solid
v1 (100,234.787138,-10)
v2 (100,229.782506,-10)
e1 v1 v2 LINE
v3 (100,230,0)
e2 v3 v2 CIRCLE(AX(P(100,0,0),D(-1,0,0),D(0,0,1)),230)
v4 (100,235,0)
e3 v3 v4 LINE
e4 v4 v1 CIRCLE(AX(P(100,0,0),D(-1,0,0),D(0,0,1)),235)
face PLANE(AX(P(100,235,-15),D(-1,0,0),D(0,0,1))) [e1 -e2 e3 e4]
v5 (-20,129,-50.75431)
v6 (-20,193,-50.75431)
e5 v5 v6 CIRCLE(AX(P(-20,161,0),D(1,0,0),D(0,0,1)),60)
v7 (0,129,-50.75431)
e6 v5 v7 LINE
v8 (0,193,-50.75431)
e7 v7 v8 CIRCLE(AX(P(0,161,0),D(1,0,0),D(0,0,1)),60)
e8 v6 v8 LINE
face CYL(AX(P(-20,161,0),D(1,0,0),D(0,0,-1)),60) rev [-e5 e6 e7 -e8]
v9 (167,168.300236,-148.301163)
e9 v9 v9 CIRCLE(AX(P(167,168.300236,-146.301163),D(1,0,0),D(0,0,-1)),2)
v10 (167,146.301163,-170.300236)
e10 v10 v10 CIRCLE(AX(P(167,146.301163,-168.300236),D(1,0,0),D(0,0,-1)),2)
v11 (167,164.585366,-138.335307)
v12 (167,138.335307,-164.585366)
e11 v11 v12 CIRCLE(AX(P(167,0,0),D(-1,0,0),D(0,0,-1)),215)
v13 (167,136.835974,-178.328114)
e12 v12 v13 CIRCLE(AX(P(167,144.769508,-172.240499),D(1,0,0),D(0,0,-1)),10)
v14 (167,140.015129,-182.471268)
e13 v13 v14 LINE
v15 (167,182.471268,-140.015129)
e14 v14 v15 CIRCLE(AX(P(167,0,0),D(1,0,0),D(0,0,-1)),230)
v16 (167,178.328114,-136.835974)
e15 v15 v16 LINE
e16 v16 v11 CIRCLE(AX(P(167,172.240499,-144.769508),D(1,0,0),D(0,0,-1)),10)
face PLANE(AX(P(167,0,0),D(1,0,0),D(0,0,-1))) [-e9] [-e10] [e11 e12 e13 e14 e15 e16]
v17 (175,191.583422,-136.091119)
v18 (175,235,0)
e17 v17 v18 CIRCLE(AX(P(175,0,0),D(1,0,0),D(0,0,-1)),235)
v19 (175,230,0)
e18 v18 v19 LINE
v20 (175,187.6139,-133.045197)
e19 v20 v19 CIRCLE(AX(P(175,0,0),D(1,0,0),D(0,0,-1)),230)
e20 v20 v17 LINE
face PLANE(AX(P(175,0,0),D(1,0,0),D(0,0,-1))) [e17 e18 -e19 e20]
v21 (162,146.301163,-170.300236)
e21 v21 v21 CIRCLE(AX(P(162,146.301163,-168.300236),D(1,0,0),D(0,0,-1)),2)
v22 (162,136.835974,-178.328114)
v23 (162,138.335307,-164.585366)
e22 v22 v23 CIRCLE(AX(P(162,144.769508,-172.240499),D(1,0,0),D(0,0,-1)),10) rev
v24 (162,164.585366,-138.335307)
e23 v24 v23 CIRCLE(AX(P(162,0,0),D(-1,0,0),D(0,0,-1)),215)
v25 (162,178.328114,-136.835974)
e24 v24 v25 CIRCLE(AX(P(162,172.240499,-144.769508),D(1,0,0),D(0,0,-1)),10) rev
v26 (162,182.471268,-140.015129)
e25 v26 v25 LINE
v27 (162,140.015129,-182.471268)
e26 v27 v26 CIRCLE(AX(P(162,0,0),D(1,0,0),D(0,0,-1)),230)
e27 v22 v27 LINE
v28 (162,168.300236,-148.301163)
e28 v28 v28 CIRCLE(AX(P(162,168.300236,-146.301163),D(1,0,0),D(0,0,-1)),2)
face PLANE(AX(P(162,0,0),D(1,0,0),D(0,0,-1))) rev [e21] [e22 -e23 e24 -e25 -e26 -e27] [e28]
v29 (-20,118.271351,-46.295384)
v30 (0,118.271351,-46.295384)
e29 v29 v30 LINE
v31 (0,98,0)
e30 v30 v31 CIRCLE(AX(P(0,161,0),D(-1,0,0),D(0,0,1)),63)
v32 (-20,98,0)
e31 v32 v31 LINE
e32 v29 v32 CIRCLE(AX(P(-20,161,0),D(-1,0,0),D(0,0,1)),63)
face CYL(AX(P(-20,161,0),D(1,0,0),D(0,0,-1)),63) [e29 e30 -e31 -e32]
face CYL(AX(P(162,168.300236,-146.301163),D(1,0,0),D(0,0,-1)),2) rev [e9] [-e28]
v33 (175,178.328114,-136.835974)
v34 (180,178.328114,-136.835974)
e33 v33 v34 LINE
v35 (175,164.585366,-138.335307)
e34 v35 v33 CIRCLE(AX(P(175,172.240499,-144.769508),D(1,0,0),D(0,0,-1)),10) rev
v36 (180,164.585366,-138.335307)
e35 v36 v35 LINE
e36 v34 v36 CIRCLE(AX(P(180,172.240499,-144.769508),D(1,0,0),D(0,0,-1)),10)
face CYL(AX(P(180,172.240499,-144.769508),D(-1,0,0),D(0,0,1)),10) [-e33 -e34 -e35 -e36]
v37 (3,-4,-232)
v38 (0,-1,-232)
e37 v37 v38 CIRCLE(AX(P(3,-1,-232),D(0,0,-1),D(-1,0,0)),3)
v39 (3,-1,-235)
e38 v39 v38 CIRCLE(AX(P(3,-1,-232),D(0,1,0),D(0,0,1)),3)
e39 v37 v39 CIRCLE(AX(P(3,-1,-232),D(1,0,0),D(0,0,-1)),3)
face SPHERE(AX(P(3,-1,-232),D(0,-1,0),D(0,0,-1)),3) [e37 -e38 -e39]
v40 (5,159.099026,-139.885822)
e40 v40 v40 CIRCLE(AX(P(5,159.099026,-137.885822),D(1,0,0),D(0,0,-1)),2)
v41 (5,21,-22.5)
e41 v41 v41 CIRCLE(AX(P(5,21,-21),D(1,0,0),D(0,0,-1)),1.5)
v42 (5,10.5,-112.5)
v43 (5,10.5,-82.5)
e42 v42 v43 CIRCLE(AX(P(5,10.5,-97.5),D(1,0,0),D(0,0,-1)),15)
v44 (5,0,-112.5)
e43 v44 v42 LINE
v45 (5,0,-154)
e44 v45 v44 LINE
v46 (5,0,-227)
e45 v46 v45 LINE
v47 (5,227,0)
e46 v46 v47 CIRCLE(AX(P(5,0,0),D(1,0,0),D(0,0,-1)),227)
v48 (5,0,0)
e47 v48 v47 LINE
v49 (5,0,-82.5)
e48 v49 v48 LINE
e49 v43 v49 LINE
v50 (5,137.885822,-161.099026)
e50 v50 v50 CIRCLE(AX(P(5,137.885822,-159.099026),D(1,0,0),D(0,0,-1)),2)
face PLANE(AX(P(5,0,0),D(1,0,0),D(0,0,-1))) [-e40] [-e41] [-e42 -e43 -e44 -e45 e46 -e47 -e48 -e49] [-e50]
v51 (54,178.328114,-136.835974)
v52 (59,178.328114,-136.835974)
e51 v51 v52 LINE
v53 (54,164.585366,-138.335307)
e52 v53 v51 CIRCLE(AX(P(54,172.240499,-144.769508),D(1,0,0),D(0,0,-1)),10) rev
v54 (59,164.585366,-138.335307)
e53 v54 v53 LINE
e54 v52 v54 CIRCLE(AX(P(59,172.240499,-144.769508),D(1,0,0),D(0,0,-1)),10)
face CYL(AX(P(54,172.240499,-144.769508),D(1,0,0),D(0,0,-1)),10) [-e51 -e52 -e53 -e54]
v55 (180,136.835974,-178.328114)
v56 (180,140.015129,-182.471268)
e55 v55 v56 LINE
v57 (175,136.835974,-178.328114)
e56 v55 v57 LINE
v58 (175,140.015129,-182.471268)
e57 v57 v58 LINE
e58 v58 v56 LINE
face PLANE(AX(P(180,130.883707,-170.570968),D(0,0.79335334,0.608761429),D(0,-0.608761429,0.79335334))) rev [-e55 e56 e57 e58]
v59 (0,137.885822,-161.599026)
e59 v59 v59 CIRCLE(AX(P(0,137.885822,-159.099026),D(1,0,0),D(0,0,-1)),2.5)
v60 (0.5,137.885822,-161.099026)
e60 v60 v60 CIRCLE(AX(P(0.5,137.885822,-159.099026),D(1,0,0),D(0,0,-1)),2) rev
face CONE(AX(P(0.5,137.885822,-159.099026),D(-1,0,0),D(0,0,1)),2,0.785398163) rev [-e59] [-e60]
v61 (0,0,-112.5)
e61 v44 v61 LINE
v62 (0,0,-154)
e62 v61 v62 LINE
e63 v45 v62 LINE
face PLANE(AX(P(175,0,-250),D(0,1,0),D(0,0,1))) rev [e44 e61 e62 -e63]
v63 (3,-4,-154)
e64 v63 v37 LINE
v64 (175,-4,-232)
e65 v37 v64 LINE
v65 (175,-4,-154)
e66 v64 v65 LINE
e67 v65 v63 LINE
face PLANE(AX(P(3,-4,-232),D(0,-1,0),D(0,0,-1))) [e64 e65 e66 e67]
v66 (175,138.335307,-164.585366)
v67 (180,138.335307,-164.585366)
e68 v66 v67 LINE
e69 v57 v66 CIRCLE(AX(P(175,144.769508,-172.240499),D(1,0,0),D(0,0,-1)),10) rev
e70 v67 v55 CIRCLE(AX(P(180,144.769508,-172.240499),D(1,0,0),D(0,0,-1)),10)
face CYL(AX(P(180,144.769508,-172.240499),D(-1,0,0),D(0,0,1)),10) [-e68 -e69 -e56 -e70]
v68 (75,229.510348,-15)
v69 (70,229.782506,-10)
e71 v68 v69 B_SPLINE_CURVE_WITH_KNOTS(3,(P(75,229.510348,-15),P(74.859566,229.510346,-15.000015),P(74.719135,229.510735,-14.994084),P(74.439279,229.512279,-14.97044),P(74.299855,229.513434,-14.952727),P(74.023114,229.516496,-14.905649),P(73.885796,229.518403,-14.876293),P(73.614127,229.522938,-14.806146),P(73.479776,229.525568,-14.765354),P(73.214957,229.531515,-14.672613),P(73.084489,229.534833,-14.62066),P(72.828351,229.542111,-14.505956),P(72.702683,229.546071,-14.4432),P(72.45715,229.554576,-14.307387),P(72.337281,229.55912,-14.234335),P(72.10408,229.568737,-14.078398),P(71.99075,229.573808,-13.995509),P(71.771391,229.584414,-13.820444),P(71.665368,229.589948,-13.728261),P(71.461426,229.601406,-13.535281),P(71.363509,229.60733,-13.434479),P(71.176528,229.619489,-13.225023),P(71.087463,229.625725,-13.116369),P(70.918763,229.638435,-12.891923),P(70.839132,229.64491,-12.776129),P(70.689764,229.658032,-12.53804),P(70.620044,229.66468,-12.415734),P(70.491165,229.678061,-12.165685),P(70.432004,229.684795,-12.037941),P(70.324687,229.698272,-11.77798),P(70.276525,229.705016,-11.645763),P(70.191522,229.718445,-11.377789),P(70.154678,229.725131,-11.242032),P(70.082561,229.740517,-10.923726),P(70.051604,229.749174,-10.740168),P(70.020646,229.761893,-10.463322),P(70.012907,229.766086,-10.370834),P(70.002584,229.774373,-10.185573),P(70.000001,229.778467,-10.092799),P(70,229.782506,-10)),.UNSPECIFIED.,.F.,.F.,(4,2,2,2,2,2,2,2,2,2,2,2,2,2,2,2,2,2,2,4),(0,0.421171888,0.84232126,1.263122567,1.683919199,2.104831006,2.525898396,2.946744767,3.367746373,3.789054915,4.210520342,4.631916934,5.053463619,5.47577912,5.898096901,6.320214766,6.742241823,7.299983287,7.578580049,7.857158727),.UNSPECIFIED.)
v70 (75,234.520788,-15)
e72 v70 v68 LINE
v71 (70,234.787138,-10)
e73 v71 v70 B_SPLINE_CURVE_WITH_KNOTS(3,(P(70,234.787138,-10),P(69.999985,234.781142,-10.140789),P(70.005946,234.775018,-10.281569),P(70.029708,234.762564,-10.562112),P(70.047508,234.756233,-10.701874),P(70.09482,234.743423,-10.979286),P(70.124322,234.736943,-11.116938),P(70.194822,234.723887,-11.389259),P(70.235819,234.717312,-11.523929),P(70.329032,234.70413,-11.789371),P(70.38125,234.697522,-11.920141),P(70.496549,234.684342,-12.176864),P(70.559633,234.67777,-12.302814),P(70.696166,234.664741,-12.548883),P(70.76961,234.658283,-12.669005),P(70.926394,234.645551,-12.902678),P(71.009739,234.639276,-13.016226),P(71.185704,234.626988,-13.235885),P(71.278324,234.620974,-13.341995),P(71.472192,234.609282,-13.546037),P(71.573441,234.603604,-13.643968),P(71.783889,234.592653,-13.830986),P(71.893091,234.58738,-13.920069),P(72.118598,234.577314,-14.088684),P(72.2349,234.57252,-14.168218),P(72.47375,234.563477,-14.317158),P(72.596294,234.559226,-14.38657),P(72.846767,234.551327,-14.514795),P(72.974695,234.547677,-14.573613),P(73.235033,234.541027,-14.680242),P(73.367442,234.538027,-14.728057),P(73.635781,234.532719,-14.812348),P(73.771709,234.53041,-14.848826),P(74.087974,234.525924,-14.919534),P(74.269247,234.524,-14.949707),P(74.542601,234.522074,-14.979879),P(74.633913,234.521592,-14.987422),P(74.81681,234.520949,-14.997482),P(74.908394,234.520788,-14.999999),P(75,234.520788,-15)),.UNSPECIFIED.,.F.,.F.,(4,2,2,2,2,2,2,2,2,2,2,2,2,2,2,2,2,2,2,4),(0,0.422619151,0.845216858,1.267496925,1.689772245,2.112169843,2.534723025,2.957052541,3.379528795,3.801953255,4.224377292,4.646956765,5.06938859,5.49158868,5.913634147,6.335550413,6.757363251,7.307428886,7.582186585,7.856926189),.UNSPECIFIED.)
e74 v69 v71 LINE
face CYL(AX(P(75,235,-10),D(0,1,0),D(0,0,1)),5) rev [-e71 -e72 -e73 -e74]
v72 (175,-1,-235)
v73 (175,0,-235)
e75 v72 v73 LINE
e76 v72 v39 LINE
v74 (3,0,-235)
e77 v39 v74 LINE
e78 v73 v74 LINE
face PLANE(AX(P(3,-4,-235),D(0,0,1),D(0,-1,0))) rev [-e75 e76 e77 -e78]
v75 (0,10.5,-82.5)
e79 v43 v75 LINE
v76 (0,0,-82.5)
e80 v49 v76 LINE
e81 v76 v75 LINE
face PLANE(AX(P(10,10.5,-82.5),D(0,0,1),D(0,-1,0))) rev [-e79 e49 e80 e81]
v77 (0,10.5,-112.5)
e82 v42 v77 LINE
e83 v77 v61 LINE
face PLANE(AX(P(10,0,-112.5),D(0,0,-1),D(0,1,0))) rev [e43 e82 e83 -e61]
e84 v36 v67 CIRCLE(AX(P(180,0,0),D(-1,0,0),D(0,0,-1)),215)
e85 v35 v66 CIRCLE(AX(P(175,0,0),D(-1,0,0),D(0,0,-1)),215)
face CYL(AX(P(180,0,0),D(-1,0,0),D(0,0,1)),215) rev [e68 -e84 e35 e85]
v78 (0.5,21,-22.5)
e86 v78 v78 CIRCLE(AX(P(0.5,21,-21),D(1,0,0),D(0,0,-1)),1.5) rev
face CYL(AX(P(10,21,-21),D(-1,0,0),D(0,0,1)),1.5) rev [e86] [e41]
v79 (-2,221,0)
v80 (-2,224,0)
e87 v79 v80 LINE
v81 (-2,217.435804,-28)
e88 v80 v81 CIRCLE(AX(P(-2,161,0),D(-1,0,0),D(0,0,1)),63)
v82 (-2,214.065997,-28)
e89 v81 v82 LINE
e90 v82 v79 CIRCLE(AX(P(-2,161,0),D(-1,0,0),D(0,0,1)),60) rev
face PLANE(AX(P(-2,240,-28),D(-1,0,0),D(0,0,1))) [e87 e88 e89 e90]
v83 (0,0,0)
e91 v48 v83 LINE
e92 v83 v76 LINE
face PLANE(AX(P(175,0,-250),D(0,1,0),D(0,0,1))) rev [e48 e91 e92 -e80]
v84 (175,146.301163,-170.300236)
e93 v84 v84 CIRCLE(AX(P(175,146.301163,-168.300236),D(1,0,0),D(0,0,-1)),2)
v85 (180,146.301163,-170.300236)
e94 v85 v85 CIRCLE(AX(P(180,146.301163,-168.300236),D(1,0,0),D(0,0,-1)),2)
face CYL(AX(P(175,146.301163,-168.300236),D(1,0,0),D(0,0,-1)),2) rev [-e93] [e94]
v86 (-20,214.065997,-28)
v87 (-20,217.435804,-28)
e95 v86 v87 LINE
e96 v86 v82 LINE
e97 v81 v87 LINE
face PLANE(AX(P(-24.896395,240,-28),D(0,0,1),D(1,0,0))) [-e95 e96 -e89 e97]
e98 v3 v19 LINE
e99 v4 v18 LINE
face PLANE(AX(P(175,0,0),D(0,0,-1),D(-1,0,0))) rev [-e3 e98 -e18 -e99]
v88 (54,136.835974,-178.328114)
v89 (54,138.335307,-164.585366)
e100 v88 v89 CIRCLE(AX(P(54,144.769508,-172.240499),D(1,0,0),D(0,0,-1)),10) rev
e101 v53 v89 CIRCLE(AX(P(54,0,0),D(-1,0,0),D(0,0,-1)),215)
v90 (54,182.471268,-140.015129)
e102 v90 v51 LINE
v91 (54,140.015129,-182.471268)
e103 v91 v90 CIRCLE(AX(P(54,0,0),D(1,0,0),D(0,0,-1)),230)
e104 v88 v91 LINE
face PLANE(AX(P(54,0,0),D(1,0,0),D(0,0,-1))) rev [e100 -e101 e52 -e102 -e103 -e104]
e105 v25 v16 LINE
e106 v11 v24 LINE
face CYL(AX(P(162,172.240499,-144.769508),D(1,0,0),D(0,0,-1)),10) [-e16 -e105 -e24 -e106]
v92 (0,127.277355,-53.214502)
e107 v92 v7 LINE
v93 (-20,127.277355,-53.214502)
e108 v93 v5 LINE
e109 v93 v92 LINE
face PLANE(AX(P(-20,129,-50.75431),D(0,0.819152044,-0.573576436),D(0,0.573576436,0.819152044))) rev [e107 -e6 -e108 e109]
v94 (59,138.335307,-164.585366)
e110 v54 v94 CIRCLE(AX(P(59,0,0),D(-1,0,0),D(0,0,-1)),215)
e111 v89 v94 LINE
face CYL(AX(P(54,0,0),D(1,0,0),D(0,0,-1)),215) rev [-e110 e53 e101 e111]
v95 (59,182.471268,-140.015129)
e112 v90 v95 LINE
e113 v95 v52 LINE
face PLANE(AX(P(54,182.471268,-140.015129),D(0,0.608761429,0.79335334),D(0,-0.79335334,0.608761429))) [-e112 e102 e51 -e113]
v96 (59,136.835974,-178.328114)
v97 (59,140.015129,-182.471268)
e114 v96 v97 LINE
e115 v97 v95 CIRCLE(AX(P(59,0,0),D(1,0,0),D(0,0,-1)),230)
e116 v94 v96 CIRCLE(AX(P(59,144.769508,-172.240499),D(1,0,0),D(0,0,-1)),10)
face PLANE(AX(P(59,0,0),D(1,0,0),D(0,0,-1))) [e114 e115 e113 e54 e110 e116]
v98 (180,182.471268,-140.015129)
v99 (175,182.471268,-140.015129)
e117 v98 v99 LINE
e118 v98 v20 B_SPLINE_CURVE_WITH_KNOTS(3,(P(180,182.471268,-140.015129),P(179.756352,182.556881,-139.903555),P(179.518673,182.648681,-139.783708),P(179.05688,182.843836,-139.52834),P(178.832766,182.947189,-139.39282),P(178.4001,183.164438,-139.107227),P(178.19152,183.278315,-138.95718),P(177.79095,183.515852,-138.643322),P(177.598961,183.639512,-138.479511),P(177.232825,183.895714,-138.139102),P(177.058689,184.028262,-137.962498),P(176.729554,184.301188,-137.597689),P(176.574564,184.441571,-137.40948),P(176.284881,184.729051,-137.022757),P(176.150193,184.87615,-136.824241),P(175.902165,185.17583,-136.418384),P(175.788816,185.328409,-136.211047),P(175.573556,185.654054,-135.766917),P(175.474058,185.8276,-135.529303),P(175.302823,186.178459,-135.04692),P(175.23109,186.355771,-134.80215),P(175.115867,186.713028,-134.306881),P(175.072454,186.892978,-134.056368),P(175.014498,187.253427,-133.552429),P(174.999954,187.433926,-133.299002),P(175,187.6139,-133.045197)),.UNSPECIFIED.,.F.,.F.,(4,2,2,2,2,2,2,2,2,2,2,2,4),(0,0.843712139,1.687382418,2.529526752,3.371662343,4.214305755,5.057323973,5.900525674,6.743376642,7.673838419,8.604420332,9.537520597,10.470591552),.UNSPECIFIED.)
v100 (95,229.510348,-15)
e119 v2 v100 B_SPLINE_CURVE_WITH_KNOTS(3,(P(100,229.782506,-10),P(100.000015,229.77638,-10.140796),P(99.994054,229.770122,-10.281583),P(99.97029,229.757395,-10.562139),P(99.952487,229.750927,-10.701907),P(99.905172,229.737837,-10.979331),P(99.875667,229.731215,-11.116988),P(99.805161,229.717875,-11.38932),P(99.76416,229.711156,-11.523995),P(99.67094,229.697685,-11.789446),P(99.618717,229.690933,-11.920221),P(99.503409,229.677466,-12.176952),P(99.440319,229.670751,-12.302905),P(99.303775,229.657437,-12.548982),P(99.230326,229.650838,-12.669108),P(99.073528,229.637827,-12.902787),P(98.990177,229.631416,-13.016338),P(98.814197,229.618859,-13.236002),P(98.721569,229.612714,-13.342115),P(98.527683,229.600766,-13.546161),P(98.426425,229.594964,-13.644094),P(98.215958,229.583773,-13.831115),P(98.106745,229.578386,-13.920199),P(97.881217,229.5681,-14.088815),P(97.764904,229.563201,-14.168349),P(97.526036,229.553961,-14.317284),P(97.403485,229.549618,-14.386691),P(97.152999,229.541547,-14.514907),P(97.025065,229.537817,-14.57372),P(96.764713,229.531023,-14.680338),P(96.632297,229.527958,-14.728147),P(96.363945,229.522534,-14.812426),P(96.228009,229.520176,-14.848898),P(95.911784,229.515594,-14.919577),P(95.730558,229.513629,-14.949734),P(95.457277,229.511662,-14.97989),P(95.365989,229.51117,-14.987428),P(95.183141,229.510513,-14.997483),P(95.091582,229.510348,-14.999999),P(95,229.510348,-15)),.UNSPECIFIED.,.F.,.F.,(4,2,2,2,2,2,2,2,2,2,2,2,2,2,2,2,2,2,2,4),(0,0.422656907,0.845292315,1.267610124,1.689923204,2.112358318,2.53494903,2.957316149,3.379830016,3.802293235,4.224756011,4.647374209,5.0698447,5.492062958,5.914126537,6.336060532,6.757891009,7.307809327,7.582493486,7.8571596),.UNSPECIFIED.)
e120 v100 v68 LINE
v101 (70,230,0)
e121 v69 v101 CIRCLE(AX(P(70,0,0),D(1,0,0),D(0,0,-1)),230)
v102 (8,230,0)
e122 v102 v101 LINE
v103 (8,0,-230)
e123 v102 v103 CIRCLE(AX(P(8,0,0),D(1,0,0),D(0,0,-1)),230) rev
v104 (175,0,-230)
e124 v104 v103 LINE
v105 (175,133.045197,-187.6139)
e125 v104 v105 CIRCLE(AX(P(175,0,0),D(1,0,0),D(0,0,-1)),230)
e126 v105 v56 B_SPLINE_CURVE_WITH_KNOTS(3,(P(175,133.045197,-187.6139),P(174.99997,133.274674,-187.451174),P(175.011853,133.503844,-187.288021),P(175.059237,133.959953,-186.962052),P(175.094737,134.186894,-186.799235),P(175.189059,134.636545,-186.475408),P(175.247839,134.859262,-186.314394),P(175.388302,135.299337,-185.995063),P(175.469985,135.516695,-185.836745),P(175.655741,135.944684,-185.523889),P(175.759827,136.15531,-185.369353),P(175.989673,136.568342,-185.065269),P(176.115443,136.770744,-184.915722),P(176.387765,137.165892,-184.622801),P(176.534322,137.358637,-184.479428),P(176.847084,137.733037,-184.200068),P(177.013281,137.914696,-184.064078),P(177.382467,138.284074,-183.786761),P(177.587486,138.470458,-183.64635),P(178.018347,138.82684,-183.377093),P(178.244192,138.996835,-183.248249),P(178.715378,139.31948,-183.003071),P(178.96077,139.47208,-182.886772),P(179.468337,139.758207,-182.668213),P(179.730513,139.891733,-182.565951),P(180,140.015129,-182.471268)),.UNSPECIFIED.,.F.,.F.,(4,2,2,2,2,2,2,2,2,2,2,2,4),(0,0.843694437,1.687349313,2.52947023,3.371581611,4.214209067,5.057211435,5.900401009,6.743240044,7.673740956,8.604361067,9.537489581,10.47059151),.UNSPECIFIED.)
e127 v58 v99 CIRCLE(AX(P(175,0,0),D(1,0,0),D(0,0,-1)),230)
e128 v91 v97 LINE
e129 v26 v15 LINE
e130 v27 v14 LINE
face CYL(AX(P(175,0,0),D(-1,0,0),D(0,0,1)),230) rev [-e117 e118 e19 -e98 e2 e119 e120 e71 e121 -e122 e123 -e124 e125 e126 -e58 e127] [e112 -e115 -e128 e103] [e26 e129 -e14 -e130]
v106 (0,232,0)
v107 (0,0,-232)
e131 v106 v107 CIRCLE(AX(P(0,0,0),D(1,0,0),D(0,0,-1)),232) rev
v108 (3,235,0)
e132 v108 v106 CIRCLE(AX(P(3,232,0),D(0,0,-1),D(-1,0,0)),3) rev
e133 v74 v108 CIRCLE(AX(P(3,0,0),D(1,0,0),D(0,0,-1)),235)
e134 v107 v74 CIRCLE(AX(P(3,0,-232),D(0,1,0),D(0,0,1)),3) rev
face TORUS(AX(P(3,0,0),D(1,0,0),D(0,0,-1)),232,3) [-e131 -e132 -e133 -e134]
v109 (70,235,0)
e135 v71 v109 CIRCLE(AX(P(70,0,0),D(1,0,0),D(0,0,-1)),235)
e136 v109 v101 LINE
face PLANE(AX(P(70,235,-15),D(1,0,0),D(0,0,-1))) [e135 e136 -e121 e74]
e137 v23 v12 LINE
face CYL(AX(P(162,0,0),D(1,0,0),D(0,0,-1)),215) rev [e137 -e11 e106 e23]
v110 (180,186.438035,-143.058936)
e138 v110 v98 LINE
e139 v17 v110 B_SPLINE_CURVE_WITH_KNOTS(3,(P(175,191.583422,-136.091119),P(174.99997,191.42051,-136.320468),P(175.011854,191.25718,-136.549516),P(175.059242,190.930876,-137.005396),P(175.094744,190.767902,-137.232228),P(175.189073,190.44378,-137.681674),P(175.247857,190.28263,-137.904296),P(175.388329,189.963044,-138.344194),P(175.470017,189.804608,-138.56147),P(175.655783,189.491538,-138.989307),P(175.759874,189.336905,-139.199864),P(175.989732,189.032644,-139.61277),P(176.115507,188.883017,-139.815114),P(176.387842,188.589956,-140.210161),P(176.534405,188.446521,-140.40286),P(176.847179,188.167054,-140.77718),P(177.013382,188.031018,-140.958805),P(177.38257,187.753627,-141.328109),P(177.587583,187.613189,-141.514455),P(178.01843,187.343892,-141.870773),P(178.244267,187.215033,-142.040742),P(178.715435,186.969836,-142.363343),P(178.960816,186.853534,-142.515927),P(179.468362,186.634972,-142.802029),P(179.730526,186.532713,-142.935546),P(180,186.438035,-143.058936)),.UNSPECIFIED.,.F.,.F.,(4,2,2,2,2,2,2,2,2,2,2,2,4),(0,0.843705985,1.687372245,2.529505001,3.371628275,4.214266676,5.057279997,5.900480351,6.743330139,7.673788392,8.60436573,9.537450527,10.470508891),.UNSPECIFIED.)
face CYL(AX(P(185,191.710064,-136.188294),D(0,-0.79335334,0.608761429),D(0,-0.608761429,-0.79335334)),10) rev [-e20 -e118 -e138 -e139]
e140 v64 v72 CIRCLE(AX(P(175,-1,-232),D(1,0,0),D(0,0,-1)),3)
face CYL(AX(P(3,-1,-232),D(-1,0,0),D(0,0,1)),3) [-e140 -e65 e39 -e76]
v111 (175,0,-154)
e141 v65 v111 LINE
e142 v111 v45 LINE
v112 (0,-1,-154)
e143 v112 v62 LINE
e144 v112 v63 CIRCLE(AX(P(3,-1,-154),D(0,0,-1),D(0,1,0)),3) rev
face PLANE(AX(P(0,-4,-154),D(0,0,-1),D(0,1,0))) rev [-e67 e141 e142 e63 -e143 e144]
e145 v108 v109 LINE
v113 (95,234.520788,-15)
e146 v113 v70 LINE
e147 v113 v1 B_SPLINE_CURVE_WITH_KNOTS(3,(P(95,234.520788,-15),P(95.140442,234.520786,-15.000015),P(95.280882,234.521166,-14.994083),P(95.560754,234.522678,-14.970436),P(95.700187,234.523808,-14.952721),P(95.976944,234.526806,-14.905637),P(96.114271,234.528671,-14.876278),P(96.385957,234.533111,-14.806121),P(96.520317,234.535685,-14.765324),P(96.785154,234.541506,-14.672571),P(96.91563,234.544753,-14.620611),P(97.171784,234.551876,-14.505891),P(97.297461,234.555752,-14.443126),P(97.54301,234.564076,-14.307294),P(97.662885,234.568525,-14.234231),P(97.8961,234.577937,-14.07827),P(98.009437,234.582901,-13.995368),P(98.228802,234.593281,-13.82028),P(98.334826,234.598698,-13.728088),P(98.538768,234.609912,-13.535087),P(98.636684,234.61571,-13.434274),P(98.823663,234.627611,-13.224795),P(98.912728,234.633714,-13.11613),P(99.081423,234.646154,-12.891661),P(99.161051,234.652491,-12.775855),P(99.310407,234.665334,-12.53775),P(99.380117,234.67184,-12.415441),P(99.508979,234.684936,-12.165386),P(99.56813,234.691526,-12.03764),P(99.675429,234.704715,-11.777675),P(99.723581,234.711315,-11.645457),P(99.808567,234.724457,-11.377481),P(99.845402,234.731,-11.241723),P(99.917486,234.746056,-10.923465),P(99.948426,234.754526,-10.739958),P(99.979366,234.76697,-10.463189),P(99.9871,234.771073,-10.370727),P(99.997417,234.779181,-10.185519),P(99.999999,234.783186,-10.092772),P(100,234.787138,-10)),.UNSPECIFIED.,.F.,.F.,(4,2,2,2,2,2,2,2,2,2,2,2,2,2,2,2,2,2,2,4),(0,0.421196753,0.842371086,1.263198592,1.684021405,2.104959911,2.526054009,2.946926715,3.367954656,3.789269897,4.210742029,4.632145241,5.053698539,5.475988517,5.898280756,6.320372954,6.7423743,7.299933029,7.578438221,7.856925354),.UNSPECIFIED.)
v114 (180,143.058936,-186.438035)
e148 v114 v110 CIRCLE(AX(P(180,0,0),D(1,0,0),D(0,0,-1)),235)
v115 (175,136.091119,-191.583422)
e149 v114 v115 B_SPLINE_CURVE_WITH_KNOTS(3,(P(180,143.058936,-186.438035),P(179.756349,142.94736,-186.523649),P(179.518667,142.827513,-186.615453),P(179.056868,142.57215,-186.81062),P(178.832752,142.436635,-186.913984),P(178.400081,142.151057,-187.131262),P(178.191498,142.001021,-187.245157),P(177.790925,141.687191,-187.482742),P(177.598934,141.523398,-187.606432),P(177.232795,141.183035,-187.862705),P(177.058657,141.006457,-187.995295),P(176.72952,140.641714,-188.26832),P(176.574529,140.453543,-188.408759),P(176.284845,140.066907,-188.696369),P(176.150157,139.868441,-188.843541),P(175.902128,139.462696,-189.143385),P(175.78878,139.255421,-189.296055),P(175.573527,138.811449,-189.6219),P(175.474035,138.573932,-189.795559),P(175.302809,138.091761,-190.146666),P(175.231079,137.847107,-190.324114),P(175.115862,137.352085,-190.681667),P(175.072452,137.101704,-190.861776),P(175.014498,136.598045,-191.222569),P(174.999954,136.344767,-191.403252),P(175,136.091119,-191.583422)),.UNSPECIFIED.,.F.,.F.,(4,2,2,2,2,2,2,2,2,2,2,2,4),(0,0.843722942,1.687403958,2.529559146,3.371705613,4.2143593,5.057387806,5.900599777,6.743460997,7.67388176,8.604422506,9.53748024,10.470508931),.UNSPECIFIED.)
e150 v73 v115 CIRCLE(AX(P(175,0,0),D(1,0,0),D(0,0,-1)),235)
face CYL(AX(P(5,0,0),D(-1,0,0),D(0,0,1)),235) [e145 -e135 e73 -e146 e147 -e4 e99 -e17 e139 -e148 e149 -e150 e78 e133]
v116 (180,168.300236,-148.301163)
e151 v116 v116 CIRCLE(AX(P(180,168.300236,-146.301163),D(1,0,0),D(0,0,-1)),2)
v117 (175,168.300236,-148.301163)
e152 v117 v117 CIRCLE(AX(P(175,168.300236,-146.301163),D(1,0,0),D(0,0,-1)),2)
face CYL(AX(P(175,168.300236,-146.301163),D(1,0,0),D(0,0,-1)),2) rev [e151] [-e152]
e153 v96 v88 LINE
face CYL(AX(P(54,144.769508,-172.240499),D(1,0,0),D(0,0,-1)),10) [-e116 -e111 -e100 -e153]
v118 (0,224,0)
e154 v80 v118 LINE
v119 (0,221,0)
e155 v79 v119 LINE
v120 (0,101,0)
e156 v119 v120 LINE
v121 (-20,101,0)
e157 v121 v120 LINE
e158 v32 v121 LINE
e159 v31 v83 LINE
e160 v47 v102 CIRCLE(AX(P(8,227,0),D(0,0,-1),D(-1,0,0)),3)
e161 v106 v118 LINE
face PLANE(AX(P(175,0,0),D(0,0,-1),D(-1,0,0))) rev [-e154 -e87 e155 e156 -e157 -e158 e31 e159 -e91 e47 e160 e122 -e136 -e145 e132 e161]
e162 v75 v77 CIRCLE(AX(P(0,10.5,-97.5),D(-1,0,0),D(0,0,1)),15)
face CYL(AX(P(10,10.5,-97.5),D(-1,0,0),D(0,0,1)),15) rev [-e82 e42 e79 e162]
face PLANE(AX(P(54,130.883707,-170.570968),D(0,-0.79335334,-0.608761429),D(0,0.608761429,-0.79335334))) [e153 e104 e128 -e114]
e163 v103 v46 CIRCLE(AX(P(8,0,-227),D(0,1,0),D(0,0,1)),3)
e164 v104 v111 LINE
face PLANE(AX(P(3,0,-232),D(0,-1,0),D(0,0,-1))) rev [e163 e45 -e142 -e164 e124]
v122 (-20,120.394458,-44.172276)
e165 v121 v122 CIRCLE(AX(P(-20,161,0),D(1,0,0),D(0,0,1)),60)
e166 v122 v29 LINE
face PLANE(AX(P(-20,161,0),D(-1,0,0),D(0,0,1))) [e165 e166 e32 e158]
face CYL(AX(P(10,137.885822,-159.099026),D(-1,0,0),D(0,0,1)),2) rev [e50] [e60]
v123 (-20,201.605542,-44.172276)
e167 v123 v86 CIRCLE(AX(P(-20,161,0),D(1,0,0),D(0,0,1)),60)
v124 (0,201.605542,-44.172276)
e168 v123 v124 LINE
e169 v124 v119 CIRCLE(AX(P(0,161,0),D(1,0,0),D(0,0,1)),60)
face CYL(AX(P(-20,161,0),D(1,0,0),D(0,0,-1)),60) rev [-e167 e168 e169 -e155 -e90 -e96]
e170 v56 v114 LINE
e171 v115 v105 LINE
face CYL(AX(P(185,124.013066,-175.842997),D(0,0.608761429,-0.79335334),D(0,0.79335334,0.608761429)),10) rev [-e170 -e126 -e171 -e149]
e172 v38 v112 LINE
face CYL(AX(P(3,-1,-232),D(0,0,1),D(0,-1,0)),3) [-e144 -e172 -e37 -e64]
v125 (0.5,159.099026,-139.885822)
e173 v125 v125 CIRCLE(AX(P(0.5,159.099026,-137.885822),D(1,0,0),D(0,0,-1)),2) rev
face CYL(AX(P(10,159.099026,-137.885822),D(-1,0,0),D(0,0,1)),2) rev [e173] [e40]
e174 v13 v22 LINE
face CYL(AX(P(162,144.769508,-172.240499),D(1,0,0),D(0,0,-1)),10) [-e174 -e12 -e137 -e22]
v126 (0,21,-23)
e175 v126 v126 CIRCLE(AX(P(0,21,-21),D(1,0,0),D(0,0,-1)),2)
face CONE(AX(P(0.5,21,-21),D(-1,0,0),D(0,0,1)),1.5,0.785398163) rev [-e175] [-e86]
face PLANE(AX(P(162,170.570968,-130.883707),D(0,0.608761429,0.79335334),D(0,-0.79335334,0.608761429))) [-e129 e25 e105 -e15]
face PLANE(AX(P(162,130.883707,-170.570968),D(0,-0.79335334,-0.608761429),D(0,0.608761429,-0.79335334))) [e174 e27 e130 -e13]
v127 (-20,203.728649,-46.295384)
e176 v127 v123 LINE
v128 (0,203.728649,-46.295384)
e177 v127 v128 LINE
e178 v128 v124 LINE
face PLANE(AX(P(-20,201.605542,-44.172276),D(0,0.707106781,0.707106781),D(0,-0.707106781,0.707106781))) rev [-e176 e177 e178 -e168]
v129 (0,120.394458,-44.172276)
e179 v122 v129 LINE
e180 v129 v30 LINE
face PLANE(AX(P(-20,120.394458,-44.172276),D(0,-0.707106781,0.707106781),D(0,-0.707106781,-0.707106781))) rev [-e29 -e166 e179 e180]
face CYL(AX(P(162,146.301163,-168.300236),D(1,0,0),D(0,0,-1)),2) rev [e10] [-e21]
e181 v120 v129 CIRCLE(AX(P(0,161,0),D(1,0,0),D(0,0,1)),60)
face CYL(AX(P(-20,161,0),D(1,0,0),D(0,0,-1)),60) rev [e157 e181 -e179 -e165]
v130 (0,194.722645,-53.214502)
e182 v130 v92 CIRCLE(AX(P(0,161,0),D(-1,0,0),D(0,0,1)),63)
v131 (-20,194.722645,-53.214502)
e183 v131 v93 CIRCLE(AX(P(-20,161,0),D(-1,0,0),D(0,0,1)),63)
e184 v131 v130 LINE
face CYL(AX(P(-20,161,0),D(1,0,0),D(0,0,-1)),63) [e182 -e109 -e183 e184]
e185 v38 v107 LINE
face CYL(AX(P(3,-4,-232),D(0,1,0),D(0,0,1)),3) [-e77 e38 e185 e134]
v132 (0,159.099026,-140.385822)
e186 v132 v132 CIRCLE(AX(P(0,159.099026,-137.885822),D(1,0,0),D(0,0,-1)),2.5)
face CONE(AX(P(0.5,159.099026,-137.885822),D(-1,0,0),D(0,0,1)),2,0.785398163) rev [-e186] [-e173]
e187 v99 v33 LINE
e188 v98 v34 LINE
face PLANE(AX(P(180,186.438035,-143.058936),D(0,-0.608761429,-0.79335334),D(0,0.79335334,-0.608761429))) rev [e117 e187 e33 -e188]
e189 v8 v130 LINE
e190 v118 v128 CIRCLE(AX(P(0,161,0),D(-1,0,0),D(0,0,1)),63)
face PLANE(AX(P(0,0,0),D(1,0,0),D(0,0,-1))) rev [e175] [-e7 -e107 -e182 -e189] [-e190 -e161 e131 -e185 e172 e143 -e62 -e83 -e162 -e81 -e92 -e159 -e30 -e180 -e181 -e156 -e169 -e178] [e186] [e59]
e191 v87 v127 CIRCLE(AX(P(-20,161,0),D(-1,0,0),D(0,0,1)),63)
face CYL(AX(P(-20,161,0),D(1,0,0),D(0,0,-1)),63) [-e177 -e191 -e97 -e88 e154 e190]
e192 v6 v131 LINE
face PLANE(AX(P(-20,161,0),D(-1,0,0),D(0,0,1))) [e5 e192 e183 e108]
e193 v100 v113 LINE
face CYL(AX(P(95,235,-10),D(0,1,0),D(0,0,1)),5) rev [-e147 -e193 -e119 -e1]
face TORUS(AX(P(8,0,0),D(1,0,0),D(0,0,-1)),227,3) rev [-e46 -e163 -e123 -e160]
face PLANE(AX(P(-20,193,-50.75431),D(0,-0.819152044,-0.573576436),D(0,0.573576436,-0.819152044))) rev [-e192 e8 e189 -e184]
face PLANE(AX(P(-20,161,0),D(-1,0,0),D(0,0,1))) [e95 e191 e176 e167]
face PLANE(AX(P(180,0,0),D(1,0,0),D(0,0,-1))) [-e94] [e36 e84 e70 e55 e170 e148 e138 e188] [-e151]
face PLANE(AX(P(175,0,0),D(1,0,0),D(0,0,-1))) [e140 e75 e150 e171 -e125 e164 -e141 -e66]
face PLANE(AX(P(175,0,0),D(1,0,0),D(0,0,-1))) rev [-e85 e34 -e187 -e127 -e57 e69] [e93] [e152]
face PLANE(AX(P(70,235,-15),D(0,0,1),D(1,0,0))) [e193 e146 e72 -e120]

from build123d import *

# Parameters (mm, degrees)
SKETCH_1_R          = 235
EXTRUDE_1_DEPTH     = 5
SKETCH_2_R          = 235
SKETCH_2_R_2        = 230
EXTRUDE_2_DEPTH     = 170
CUT_EXTRUDE_1_DEPTH = 376.599520766
EXTRUDE_START       = -5
EXTRUDE_3_DEPTH     = 5
EXTRUDE_4_DEPTH     = 5
SKETCH_6_R          = 2
CUT_EXTRUDE_2_DEPTH = 5
FILLET_1_R          = 3
EXTRUDE_5_DEPTH     = 5
FILLET_2_R          = 10
FILLET_3_R          = 10
SKETCH_8_R          = 2
CUT_EXTRUDE_3_DEPTH = 5
FILLET_4_R          = 10
EXTRUDE_6_DEPTH     = 4
FILLET_5_R          = 3
EXTRUDE_7_DEPTH     = 20
CUT_EXTRUDE_START   = 120
SKETCH_12_W         = 22.896395415
SKETCH_12_H         = 51.404652451
CUT_EXTRUDE_5_DEPTH = 120
SKETCH_13_W         = 30
SKETCH_13_H         = 30
CUT_EXTRUDE_6_DEPTH = 378.955023951
FILLET_6_R          = 5
CUT_EXTRUDE_7_DEPTH = 10
SKETCH_15_R         = 1.5
CUT_EXTRUDE_8_DEPTH = 10
CHAMFER_1_SIZE      = 0.5
SKETCH_16_R         = 2
CUT_EXTRUDE_9_DEPTH = 10
CHAMFER_2_SIZE      = 0.5


with BuildPart() as part:
    # 草图1 → 凸台-拉伸1 (new body)
    with BuildSketch(Plane(origin=(0, 0, 0), x_dir=(0, 0, -1), z_dir=(1, 0, 0))):
        Circle(SKETCH_1_R)
    extrude(amount=EXTRUDE_1_DEPTH)

    # 草图2 → 凸台-拉伸2 (add)
    with BuildSketch(Plane(origin=(5, 0, 0), x_dir=(0, 0, -1), z_dir=(1, 0, 0))):
        Circle(SKETCH_2_R)
        Circle(SKETCH_2_R_2, mode=Mode.SUBTRACT)
    extrude(amount=EXTRUDE_2_DEPTH)

    # 草图3 → 切除-拉伸1 (cut, through all)
    with BuildSketch(Plane.ZY):
        Polygon((0, 0), (0, 250), (330.887429436, 250), (330.887429436, -253.432712339), (-250, -253.432712339), (-250, 0), align=None)
    extrude(amount=-CUT_EXTRUDE_1_DEPTH, mode=Mode.SUBTRACT)

    # 草图4 → 凸台-拉伸3 (add)
    with BuildSketch(Plane(origin=(167, 0, 0), x_dir=(0, 0, -1), z_dir=(1, 0, 0)).offset(EXTRUDE_START)):
        with BuildLine():
            Line((170.570968163, 130.883707237), (182.471268267, 140.015128672))
            ThreePointArc((182.471268267, 140.015128672), (162.634559673, 162.634559673), (140.015128672, 182.471268267))
            Line((140.015128672, 182.471268267), (130.883707237, 170.570968163))
            ThreePointArc((130.883707237, 170.570968163), (152.027957955, 152.027957955), (170.570968163, 130.883707237))
        make_face()
    extrude(amount=EXTRUDE_3_DEPTH)

    # 草图5 → 凸台-拉伸4 (add)
    with BuildSketch(Plane(origin=(59, 0, 0), x_dir=(0, 0, -1), z_dir=(1, 0, 0)).offset(EXTRUDE_START)):
        with BuildLine():
            Line((170.570968163, 130.883707237), (182.471268267, 140.015128672))
            ThreePointArc((182.471268267, 140.015128672), (162.634559673, 162.634559673), (140.015128672, 182.471268267))
            Line((140.015128672, 182.471268267), (130.883707237, 170.570968163))
            ThreePointArc((130.883707237, 170.570968163), (152.027957955, 152.027957955), (170.570968163, 130.883707237))
        make_face()
    extrude(amount=EXTRUDE_4_DEPTH)

    # 草图6 → 切除-拉伸2 (cut)
    with BuildSketch(Plane(origin=(167, 0, 0), x_dir=(0, 0, -1), z_dir=(1, 0, 0))):
        with Locations((146.301163465, 168.30023639)):
            Circle(SKETCH_6_R)
        with Locations((168.30023639, 146.301163465)):
            Circle(SKETCH_6_R)
    extrude(amount=-CUT_EXTRUDE_2_DEPTH, mode=Mode.SUBTRACT)

    # 圆角1
    fillet_1_edges = [part.edges().sort_by_distance(p)[0] for p in [
        (5, 162.634559673, -162.634559673),
        (0, 166.170093579, -166.170093579),
    ]]
    fillet(fillet_1_edges, radius=FILLET_1_R)

    # 草图7 → 凸台-拉伸5 (add)
    with BuildSketch(Plane(origin=(175, 0, 0), x_dir=(0, 0, -1), z_dir=(1, 0, 0))):
        with BuildLine():
            Line((170.570968163, 130.883707237), (186.438034968, 143.058935817))
            ThreePointArc((186.438034968, 143.058935817), (166.170093579, 166.170093579), (143.058935817, 186.438034968))
            Line((143.058935817, 186.438034968), (130.883707237, 170.570968163))
            ThreePointArc((130.883707237, 170.570968163), (152.027957955, 152.027957955), (170.570968163, 130.883707237))
        make_face()
    extrude(amount=EXTRUDE_5_DEPTH)

    # 圆角2
    # the kernel refuses this fillet: 10 mm, written as the material it adds along each edge
    with BuildSketch(Plane(origin=(175, 203.61463864, -156.239007376), x_dir=(0, 0.6087614290087151, 0.7933533402912394), z_dir=(0, -0.7933533402912395, 0.6087614290087151))) as fillet_2_piece_1_section:
        with BuildLine():
            CenterArc((8.660254038, -10), FILLET_2_R, 90, 60)
            Line((0, -5), (0, 0))
            Line((0, 0), (8.660254038, 0))
        make_face()
    fillet_2_piece_1 = extrude(amount=48.301270189, mode=Mode.PRIVATE)
    fillet_2_piece_1 = fillet_2_piece_1 & Plane(origin=(176.322425454, 0, 0), x_dir=(0, 0, -1), z_dir=(-1, 0, 0)) * Cylinder(235, 132, mode=Mode.PRIVATE)
    fillet_2_piece_1 = fillet_2_piece_1 - Plane(origin=(176.322425454, 0, 0), x_dir=(0, 0, -1), z_dir=(-1, 0, 0)) * Cylinder(230, 132, mode=Mode.PRIVATE)
    add(fillet_2_piece_1)
    with BuildSketch(Plane(origin=(175, 126.835057113, -165.294664595), x_dir=(0, -0.7933533402912374, -0.6087614290087175), z_dir=(0, 0.6087614290087178, -0.7933533402912375))) as fillet_2_piece_2_section:
        with BuildLine():
            CenterArc((8.660254038, -10), FILLET_2_R, 90, 60)
            Line((0, -5), (0, 0))
            Line((0, 0), (8.660254038, 0))
        make_face()
    fillet_2_piece_2 = extrude(amount=48.301270189, mode=Mode.PRIVATE)
    fillet_2_piece_2 = fillet_2_piece_2 & Plane(origin=(176.322425454, 0, 0), x_dir=(0, 0, -1), z_dir=(-1, 0, 0)) * Cylinder(235, 132, mode=Mode.PRIVATE)
    fillet_2_piece_2 = fillet_2_piece_2 - Plane(origin=(176.322425454, 0, 0), x_dir=(0, 0, -1), z_dir=(-1, 0, 0)) * Cylinder(230, 132, mode=Mode.PRIVATE)
    add(fillet_2_piece_2)

    # 圆角3
    fillet_3_edges = [part.edges().sort_by_distance(p)[0] for p in [
        (164.5, 130.883707237, -170.570968163),
        (164.5, 170.570968163, -130.883707237),
        (177.5, 170.570968163, -130.883707237),
        (177.5, 130.883707237, -170.570968163),
    ]]
    fillet(fillet_3_edges, radius=FILLET_3_R)

    # 草图8 → 切除-拉伸3 (cut)
    with BuildSketch(Plane(origin=(180, 0, 0), x_dir=(0, 0, -1), z_dir=(1, 0, 0))):
        with Locations((168.30023639, 146.301163465)):
            Circle(SKETCH_8_R)
        with Locations((146.301163465, 168.30023639)):
            Circle(SKETCH_8_R)
    extrude(amount=-CUT_EXTRUDE_3_DEPTH, mode=Mode.SUBTRACT)

    # 圆角4
    fillet_4_edges = [part.edges().sort_by_distance(p)[0] for p in [
        (56.5, 130.883707237, -170.570968163),
        (56.5, 170.570968163, -130.883707237),
    ]]
    fillet(fillet_4_edges, radius=FILLET_4_R)

    # 草图10 → 凸台-拉伸6 (add)
    with BuildSketch(Plane.XZ):
        with BuildLine():
            Line((0, -154), (0, -232))
            ThreePointArc((0, -232), (0.878679656, -234.121320344), (3, -235))
            Line((3, -235), (175, -235))
            Line((175, -235), (175, -154))
            Line((175, -154), (0, -154))
        make_face()
    extrude(amount=EXTRUDE_6_DEPTH)

    # 圆角5
    fillet_5_edges = [part.edges().sort_by_distance(p)[0] for p in [
        (0.878679656, -4, -234.121320344),
        (89, -4, -235),
        (0, -4, -193),
    ]]
    fillet(fillet_5_edges, radius=FILLET_5_R)

    # 草图11 → 凸台-拉伸7 (add)
    with BuildSketch(Plane.ZY):
        with BuildLine():
            Line((0, 224), (0, 221))
            ThreePointArc((0, 221), (-24.121230247, 215.937839886), (-44.172276172, 201.605541713))
            Line((-44.172276172, 201.605541713), (-46.2953836, 203.72864914))
            ThreePointArc((-46.2953836, 203.72864914), (-25.269498453, 218.710072326), (0, 224))
        make_face()
        with BuildLine():
            Line((0, 98), (0, 101))
            ThreePointArc((0, 101), (-24.121230247, 106.062160114), (-44.172276172, 120.394458287))
            Line((-44.172276172, 120.394458287), (-46.2953836, 118.27135086))
            ThreePointArc((-46.2953836, 118.27135086), (-25.269498453, 103.289927674), (0, 98))
        make_face()
        with BuildLine():
            Line((-50.754310162, 129), (-53.214501999, 127.27735513))
            ThreePointArc((-53.214501999, 127.27735513), (-63, 161), (-53.214501999, 194.72264487))
            Line((-53.214501999, 194.72264487), (-50.754310162, 193))
            ThreePointArc((-50.754310162, 193), (-60, 161), (-50.754310162, 129))
        make_face()
    extrude(amount=EXTRUDE_7_DEPTH)

    # 草图12 → 切除-拉伸5 (cut)
    with BuildSketch(Plane(origin=(0, 0, 0), x_dir=(1, 0, 0), z_dir=(0, 1, 0)).offset(CUT_EXTRUDE_START)):
        with Locations((-13.448197708, 2.297673774)):
            Rectangle(SKETCH_12_W, SKETCH_12_H)
    extrude(amount=CUT_EXTRUDE_5_DEPTH, mode=Mode.SUBTRACT)

    # 草图13 → 切除-拉伸6 (cut, through all)
    with BuildSketch(Plane(origin=(0, 0, 0), x_dir=(1, 0, 0), z_dir=(0, 1, 0))):
        with Locations((85, 0)):
            Rectangle(SKETCH_13_W, SKETCH_13_H)
    extrude(amount=CUT_EXTRUDE_6_DEPTH, mode=Mode.SUBTRACT)

    # 圆角6
    fillet_6_edges = [part.edges().sort_by_distance(p)[0] for p in [
        (70, 232.015568171, -15),
        (100, 232.015568171, -15),
    ]]
    fillet(fillet_6_edges, radius=FILLET_6_R)

    # 草图14 → 切除-拉伸7 (cut)
    with BuildSketch(Plane.ZY):
        with BuildLine():
            Line((-82.5, 10.5), (-82.5, 0))
            Line((-82.5, 0), (-112.5, 0))
            Line((-112.5, 0), (-112.5, 10.5))
            ThreePointArc((-112.5, 10.5), (-97.5, 25.5), (-82.5, 10.5))
        make_face()
    extrude(amount=-CUT_EXTRUDE_7_DEPTH, mode=Mode.SUBTRACT)

    # 草图15 → 切除-拉伸8 (cut)
    with BuildSketch(Plane.ZY):
        with Locations((-21, 21)):
            Circle(SKETCH_15_R)
    extrude(amount=-CUT_EXTRUDE_8_DEPTH, mode=Mode.SUBTRACT)

    # 倒角1
    chamfer_1_edges = [part.edges().sort_by_distance(p)[0] for p in [
        (0, 21, -22.5),
    ]]
    chamfer(chamfer_1_edges, length=CHAMFER_1_SIZE)

    # 草图16 → 切除-拉伸9 (cut)
    with BuildSketch(Plane.ZY):
        with Locations((-159.099025767, 137.885822331)):
            Circle(SKETCH_16_R)
        with Locations((-137.885822331, 159.099025767)):
            Circle(SKETCH_16_R)
    extrude(amount=-CUT_EXTRUDE_9_DEPTH, mode=Mode.SUBTRACT)

    # 倒角2
    chamfer_2_edges = [part.edges().sort_by_distance(p)[0] for p in [
        (0, 137.885822331, -161.099025767),
        (0, 159.099025767, -139.885822331),
    ]]
    chamfer(chamfer_2_edges, length=CHAMFER_2_SIZE)


solid = part.part
